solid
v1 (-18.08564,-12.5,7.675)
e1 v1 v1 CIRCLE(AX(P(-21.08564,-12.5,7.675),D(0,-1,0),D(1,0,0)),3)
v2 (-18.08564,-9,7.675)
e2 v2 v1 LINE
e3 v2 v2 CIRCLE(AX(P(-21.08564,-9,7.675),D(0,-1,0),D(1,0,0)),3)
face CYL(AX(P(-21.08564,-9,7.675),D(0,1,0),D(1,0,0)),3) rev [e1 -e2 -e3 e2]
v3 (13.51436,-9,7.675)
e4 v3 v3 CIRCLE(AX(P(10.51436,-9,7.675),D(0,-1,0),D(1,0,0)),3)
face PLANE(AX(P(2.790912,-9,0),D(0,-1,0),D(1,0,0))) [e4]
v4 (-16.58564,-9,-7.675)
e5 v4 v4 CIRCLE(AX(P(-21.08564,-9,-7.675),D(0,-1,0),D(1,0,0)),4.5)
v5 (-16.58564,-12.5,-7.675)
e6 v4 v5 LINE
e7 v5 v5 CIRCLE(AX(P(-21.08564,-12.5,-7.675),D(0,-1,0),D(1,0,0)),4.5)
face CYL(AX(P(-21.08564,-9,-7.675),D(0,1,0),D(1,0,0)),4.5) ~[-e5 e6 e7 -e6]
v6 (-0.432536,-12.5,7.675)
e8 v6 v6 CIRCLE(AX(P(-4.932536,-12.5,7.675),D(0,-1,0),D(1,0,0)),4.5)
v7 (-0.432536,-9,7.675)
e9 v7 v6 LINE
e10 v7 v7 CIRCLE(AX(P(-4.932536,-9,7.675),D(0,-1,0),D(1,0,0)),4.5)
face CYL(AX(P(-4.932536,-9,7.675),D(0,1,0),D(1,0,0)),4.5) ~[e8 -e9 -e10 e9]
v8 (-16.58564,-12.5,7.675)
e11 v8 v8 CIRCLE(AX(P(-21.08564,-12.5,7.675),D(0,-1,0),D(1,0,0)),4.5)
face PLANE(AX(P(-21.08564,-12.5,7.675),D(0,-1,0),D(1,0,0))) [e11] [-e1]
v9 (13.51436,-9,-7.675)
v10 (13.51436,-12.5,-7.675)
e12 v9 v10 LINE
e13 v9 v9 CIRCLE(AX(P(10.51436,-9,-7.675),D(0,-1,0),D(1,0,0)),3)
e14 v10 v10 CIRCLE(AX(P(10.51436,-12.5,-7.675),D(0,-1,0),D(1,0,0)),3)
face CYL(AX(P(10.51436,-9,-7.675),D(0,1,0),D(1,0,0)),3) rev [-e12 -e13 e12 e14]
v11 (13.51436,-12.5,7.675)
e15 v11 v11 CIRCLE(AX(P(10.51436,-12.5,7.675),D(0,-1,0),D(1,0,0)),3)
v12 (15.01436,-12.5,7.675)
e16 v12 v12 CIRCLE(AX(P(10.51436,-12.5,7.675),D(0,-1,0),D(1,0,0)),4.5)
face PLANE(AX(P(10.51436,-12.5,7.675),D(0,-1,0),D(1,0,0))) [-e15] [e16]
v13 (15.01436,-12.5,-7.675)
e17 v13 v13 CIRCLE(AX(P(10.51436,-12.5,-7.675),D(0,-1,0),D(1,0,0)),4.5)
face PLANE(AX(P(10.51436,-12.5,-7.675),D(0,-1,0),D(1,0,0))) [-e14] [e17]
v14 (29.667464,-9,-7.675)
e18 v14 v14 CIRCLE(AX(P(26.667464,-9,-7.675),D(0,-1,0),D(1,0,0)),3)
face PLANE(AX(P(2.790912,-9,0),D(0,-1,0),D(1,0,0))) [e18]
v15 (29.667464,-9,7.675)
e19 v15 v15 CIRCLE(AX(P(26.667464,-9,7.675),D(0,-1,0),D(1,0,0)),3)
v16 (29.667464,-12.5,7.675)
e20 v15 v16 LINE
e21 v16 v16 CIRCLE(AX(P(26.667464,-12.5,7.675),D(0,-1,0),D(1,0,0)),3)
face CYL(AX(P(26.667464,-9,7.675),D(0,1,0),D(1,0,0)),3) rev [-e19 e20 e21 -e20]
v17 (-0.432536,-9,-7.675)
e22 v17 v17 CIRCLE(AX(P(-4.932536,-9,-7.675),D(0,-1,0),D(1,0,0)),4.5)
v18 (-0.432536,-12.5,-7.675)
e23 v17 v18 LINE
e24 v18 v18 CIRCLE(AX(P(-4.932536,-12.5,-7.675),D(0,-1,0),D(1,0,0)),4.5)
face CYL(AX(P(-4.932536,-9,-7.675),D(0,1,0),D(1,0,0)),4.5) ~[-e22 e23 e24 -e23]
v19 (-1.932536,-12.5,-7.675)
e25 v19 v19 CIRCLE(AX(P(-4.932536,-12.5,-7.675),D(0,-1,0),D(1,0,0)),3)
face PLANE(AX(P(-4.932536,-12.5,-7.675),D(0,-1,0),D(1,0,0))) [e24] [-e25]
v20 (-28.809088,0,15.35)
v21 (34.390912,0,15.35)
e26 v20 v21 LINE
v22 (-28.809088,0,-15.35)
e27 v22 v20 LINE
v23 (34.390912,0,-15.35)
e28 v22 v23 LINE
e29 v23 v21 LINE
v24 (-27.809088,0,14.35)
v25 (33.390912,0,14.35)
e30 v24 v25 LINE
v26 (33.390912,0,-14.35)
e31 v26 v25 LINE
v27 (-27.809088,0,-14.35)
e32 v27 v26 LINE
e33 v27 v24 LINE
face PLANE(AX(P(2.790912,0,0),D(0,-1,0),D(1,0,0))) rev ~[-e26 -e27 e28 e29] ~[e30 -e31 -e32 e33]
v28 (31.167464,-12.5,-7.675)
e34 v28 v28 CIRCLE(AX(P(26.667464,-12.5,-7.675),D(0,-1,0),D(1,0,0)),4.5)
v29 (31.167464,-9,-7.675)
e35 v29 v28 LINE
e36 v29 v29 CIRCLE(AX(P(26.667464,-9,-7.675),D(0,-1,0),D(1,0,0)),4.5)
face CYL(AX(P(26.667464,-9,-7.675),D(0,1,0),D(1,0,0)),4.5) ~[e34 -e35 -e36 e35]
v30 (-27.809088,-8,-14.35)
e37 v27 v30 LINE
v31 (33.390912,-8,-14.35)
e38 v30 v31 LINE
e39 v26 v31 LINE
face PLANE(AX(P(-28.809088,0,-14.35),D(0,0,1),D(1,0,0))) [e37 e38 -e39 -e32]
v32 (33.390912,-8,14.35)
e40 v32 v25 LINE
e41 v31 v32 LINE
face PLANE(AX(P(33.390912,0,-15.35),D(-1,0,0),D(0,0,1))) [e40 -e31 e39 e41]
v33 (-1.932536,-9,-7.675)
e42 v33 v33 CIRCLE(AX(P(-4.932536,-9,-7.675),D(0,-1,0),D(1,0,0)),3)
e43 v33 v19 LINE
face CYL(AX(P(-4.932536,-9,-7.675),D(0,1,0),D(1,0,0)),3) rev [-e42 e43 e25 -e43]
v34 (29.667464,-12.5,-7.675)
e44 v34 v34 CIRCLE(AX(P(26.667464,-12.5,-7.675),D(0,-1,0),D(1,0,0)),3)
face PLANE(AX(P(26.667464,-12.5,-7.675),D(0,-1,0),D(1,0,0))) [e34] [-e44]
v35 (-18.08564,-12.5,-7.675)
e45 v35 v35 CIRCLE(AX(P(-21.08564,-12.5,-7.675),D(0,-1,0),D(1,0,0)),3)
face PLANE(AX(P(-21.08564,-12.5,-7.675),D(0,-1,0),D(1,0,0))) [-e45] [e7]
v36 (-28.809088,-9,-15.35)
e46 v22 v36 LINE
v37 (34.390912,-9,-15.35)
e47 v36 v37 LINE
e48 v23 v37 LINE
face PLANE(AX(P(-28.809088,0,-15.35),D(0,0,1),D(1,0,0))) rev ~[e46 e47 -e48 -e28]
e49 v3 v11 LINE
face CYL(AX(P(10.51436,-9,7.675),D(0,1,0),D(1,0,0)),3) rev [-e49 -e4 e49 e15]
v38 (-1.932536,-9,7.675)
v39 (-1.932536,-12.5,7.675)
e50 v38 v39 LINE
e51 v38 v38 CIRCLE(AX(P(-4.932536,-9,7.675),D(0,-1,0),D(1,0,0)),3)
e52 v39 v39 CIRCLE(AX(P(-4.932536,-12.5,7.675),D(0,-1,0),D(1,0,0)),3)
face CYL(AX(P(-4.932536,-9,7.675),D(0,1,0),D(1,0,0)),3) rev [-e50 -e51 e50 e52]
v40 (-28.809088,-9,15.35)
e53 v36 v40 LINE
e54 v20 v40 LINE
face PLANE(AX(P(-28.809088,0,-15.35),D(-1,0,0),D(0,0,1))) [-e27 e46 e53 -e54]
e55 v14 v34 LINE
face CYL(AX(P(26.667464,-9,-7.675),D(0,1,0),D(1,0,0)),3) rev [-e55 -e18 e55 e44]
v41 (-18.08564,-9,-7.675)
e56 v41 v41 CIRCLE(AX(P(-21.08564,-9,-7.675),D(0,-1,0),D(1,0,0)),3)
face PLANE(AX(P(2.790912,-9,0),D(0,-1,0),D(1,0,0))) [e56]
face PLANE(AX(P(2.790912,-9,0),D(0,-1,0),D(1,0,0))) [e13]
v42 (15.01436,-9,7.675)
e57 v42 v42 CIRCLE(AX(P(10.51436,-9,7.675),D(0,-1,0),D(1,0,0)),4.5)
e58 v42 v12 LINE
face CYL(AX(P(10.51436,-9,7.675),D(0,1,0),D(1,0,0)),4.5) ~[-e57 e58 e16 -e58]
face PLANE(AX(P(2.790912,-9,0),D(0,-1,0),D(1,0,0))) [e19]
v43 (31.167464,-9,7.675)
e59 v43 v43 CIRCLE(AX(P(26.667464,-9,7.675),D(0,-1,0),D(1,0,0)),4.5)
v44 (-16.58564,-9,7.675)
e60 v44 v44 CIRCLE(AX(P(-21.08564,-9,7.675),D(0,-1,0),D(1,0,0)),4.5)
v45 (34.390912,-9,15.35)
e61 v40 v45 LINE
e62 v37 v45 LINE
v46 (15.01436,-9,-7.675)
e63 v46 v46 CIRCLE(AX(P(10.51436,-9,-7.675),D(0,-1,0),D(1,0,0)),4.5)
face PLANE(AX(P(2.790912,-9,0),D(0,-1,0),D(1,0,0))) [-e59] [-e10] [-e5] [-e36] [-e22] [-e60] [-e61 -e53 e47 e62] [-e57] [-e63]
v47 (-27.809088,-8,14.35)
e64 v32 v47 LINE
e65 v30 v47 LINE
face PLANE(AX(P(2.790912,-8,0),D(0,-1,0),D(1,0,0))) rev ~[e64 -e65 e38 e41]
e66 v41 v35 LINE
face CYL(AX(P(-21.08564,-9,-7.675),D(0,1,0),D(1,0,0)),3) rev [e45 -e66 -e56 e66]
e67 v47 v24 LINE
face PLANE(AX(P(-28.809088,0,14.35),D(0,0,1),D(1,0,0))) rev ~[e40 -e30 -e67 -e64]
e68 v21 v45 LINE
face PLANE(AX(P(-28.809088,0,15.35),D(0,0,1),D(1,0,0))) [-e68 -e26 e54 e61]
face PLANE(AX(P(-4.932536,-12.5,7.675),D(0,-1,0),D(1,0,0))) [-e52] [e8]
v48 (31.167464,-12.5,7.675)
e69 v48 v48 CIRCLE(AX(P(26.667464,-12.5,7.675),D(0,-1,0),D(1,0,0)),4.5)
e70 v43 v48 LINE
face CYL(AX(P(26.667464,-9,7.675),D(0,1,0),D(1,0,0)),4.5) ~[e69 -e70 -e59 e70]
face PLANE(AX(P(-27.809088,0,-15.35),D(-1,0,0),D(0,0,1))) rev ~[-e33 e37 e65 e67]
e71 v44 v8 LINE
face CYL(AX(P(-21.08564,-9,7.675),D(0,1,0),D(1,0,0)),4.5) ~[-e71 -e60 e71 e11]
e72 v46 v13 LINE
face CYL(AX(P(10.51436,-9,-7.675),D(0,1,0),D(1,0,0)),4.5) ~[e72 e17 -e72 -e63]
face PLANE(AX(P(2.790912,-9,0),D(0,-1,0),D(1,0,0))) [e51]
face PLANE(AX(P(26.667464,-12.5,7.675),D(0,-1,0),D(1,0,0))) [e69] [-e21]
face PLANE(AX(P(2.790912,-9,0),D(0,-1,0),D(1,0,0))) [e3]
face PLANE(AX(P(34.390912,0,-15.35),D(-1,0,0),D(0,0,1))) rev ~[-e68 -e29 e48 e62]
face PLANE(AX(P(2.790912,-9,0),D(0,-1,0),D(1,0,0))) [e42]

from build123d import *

# Parameters (mm, degrees)
F0_W     = 63.2
F0_H     = 30.7
F1_DEPTH = 9
F2_R     = 4.5
F2_R_2   = 3
F3_DEPTH = 3.5
F4_T     = 1


# Not quite as in the source:
# - a shell that OpenCascade refuses in one call is made with other operations: the cavity is built on its own and cut out


with BuildPart() as f1:
    # F0 (on Front) → F1 (new body)
    with BuildSketch(Plane.XZ):
        with Locations((2.7909118284, 0)):
            Rectangle(F0_W, F0_H)
    extrude(amount=F1_DEPTH)

    # F2 (on face) → F3 (join)
    with BuildSketch(Plane.XZ.offset(9)):
        with Locations((-21.0856401334, 7.675)):
            Circle(F2_R)
        with Locations((-21.0856401334, 7.675)):
            Circle(F2_R_2, mode=Mode.SUBTRACT)
        with Locations((-4.9325362097, 7.675)):
            Circle(F2_R)
        with Locations((-4.9325362097, 7.675)):
            Circle(F2_R_2, mode=Mode.SUBTRACT)
        with Locations((10.5143598666, 7.675)):
            Circle(F2_R)
        with Locations((10.5143598666, 7.675)):
            Circle(F2_R_2, mode=Mode.SUBTRACT)
        with Locations((-4.9325362097, -7.675)):
            Circle(F2_R)
        with Locations((-4.9325362097, -7.675)):
            Circle(F2_R_2, mode=Mode.SUBTRACT)
        with Locations((10.5143598666, -7.675)):
            Circle(F2_R)
        with Locations((10.5143598666, -7.675)):
            Circle(F2_R_2, mode=Mode.SUBTRACT)
        with Locations((-21.0856401334, -7.675)):
            Circle(F2_R)
        with Locations((-21.0856401334, -7.675)):
            Circle(F2_R_2, mode=Mode.SUBTRACT)
        with Locations((26.6674637903, -7.675)):
            Circle(F2_R)
        with Locations((26.6674637903, -7.675)):
            Circle(F2_R_2, mode=Mode.SUBTRACT)
        with Locations((26.6674637903, 7.675)):
            Circle(F2_R)
        with Locations((26.6674637903, 7.675)):
            Circle(F2_R_2, mode=Mode.SUBTRACT)
    extrude(amount=F3_DEPTH)

    # F4: shell of thickness 1, made by hand


with BuildPart() as f4_core1:
    # F4_t2: copy of F1
    add(f1.part)

    # the walls: a layer under each face that stays
    f4_faces = [f4_core1.faces().sort_by_distance(p)[0] for p in [
        (2.7909118284, -4.5, -15.35),
        (-28.8090881716, -4.5, 0),
        (34.3909118284, -4.5, 0),
        (2.7909118284, -9, 0),
        (2.7909118284, -4.5, 15.35),
        (-25.5856401334, -10.75, -7.675),
        (-9.4325362097, -10.75, -7.675),
        (6.0143598666, -10.75, -7.675),
        (22.1674637903, -10.75, -7.675),
        (-25.5856401334, -10.75, 7.675),
        (-9.4325362097, -10.75, 7.675),
        (6.0143598666, -10.75, 7.675),
        (22.1674637903, -10.75, 7.675),
        (-24.0856401334, -12.5, -10.675),
        (-7.9325362097, -12.5, -10.675),
        (7.5143598666, -12.5, -10.675),
        (23.6674637903, -12.5, -10.675),
        (-24.0856401334, -12.5, 4.675),
        (-7.9325362097, -12.5, 4.675),
        (7.5143598666, -12.5, 4.675),
        (23.6674637903, -12.5, 4.675),
        (-24.0856401334, -10.75, -7.675),
        (-7.9325362097, -10.75, -7.675),
        (7.5143598666, -10.75, -7.675),
        (23.6674637903, -10.75, -7.675),
        (-24.0856401334, -10.75, 7.675),
        (-7.9325362097, -10.75, 7.675),
        (7.5143598666, -10.75, 7.675),
        (23.6674637903, -10.75, 7.675),
        (-21.0856401334, -9, -7.675),
        (-4.9325362097, -9, -7.675),
        (10.5143598666, -9, -7.675),
        (26.6674637903, -9, -7.675),
        (-21.0856401334, -9, 7.675),
        (-4.9325362097, -9, 7.675),
        (10.5143598666, -9, 7.675),
        (26.6674637903, -9, 7.675),
    ]]
    thicken(f4_faces, amount=-F4_T, mode=Mode.SUBTRACT)

    # F4_s3 → F4_t4 (revolve, cut)
    with BuildSketch(Plane.XY.offset(-7.675)):
        Polygon((-16.5756401334, -9.01), (-16.5856401334, -8), (-17.5856401334, -8), (-17.5856401334, -9), align=None)
    revolve(axis=Axis((-21.0856401334, -9, -7.675), (0, -1, 0)), mode=Mode.SUBTRACT)

    # F4_s5 → F4_t6 (revolve, cut)
    with BuildSketch(Plane.XY.offset(-7.675)):
        Polygon((-0.4225362097, -9.01), (-0.4325362097, -8), (-1.4325362097, -8), (-1.4325362097, -9), align=None)
    revolve(axis=Axis((-4.9325362097, -9, -7.675), (0, -1, 0)), mode=Mode.SUBTRACT)

    # F4_s7 → F4_t8 (revolve, cut)
    with BuildSketch(Plane.XY.offset(-7.675)):
        Polygon((15.0243598666, -9.01), (15.0143598666, -8), (14.0143598666, -8), (14.0143598666, -9), align=None)
    revolve(axis=Axis((10.5143598666, -9, -7.675), (0, -1, 0)), mode=Mode.SUBTRACT)

    # F4_s9 → F4_t10 (revolve, cut)
    with BuildSketch(Plane.XY.offset(-7.675)):
        Polygon((31.1774637903, -9.01), (31.1674637903, -8), (30.1674637903, -8), (30.1674637903, -9), align=None)
    revolve(axis=Axis((26.6674637903, -9, -7.675), (0, -1, 0)), mode=Mode.SUBTRACT)

    # F4_s11 → F4_t12 (revolve, cut)
    with BuildSketch(Plane.XY.offset(7.675)):
        Polygon((-16.5756401334, -9.01), (-16.5856401334, -8), (-17.5856401334, -8), (-17.5856401334, -9), align=None)
    revolve(axis=Axis((-21.0856401334, -9, 7.675), (0, -1, 0)), mode=Mode.SUBTRACT)

    # F4_s13 → F4_t14 (revolve, cut)
    with BuildSketch(Plane.XY.offset(7.675)):
        Polygon((-0.4225362097, -9.01), (-0.4325362097, -8), (-1.4325362097, -8), (-1.4325362097, -9), align=None)
    revolve(axis=Axis((-4.9325362097, -9, 7.675), (0, -1, 0)), mode=Mode.SUBTRACT)

    # F4_s15 → F4_t16 (revolve, cut)
    with BuildSketch(Plane.XY.offset(7.675)):
        Polygon((15.0243598666, -9.01), (15.0143598666, -8), (14.0143598666, -8), (14.0143598666, -9), align=None)
    revolve(axis=Axis((10.5143598666, -9, 7.675), (0, -1, 0)), mode=Mode.SUBTRACT)

    # F4_s17 → F4_t18 (revolve, cut)
    with BuildSketch(Plane.XY.offset(7.675)):
        Polygon((31.1774637903, -9.01), (31.1674637903, -8), (30.1674637903, -8), (30.1674637903, -9), align=None)
    revolve(axis=Axis((26.6674637903, -9, 7.675), (0, -1, 0)), mode=Mode.SUBTRACT)

    # F4_s19 → F4_t20 (revolve, cut)
    with BuildSketch(Plane.XY.offset(-7.675)):
        Polygon((-18.0956401334, -9.01), (-17.0856401334, -9), (-17.0856401334, -8), (-18.0856401334, -8), align=None)
    revolve(axis=Axis((-21.0856401334, -9, -7.675), (0, -1, 0)), mode=Mode.SUBTRACT)

    # F4_s21 → F4_t22 (revolve, cut)
    with BuildSketch(Plane.XY.offset(-7.675)):
        Polygon((-1.9425362097, -9.01), (-0.9325362097, -9), (-0.9325362097, -8), (-1.9325362097, -8), align=None)
    revolve(axis=Axis((-4.9325362097, -9, -7.675), (0, -1, 0)), mode=Mode.SUBTRACT)

    # F4_s23 → F4_t24 (revolve, cut)
    with BuildSketch(Plane.XY.offset(-7.675)):
        Polygon((13.5043598666, -9.01), (14.5143598666, -9), (14.5143598666, -8), (13.5143598666, -8), align=None)
    revolve(axis=Axis((10.5143598666, -9, -7.675), (0, -1, 0)), mode=Mode.SUBTRACT)

    # F4_s25 → F4_t26 (revolve, cut)
    with BuildSketch(Plane.XY.offset(-7.675)):
        Polygon((29.6574637903, -9.01), (30.6674637903, -9), (30.6674637903, -8), (29.6674637903, -8), align=None)
    revolve(axis=Axis((26.6674637903, -9, -7.675), (0, -1, 0)), mode=Mode.SUBTRACT)

    # F4_s27 → F4_t28 (revolve, cut)
    with BuildSketch(Plane.XY.offset(7.675)):
        Polygon((-18.0956401334, -9.01), (-17.0856401334, -9), (-17.0856401334, -8), (-18.0856401334, -8), align=None)
    revolve(axis=Axis((-21.0856401334, -9, 7.675), (0, -1, 0)), mode=Mode.SUBTRACT)

    # F4_s29 → F4_t30 (revolve, cut)
    with BuildSketch(Plane.XY.offset(7.675)):
        Polygon((-1.9425362097, -9.01), (-0.9325362097, -9), (-0.9325362097, -8), (-1.9325362097, -8), align=None)
    revolve(axis=Axis((-4.9325362097, -9, 7.675), (0, -1, 0)), mode=Mode.SUBTRACT)

    # F4_s31 → F4_t32 (revolve, cut)
    with BuildSketch(Plane.XY.offset(7.675)):
        Polygon((13.5043598666, -9.01), (14.5143598666, -9), (14.5143598666, -8), (13.5143598666, -8), align=None)
    revolve(axis=Axis((10.5143598666, -9, 7.675), (0, -1, 0)), mode=Mode.SUBTRACT)

    # F4_s33 → F4_t34 (revolve, cut)
    with BuildSketch(Plane.XY.offset(7.675)):
        Polygon((29.6574637903, -9.01), (30.6674637903, -9), (30.6674637903, -8), (29.6674637903, -8), align=None)
    revolve(axis=Axis((26.6674637903, -9, 7.675), (0, -1, 0)), mode=Mode.SUBTRACT)


with BuildPart() as f1_1:
    add(f1.part)

    # what is left inside the walls is the cavity
    f4_cavity = [f4_core1.part.solids().sort_by_distance(p)[0] for p in [
        (2.790912, -0.01, -4.783333),
    ]]
    add(f4_cavity, mode=Mode.SUBTRACT)


solid = f1_1.part
